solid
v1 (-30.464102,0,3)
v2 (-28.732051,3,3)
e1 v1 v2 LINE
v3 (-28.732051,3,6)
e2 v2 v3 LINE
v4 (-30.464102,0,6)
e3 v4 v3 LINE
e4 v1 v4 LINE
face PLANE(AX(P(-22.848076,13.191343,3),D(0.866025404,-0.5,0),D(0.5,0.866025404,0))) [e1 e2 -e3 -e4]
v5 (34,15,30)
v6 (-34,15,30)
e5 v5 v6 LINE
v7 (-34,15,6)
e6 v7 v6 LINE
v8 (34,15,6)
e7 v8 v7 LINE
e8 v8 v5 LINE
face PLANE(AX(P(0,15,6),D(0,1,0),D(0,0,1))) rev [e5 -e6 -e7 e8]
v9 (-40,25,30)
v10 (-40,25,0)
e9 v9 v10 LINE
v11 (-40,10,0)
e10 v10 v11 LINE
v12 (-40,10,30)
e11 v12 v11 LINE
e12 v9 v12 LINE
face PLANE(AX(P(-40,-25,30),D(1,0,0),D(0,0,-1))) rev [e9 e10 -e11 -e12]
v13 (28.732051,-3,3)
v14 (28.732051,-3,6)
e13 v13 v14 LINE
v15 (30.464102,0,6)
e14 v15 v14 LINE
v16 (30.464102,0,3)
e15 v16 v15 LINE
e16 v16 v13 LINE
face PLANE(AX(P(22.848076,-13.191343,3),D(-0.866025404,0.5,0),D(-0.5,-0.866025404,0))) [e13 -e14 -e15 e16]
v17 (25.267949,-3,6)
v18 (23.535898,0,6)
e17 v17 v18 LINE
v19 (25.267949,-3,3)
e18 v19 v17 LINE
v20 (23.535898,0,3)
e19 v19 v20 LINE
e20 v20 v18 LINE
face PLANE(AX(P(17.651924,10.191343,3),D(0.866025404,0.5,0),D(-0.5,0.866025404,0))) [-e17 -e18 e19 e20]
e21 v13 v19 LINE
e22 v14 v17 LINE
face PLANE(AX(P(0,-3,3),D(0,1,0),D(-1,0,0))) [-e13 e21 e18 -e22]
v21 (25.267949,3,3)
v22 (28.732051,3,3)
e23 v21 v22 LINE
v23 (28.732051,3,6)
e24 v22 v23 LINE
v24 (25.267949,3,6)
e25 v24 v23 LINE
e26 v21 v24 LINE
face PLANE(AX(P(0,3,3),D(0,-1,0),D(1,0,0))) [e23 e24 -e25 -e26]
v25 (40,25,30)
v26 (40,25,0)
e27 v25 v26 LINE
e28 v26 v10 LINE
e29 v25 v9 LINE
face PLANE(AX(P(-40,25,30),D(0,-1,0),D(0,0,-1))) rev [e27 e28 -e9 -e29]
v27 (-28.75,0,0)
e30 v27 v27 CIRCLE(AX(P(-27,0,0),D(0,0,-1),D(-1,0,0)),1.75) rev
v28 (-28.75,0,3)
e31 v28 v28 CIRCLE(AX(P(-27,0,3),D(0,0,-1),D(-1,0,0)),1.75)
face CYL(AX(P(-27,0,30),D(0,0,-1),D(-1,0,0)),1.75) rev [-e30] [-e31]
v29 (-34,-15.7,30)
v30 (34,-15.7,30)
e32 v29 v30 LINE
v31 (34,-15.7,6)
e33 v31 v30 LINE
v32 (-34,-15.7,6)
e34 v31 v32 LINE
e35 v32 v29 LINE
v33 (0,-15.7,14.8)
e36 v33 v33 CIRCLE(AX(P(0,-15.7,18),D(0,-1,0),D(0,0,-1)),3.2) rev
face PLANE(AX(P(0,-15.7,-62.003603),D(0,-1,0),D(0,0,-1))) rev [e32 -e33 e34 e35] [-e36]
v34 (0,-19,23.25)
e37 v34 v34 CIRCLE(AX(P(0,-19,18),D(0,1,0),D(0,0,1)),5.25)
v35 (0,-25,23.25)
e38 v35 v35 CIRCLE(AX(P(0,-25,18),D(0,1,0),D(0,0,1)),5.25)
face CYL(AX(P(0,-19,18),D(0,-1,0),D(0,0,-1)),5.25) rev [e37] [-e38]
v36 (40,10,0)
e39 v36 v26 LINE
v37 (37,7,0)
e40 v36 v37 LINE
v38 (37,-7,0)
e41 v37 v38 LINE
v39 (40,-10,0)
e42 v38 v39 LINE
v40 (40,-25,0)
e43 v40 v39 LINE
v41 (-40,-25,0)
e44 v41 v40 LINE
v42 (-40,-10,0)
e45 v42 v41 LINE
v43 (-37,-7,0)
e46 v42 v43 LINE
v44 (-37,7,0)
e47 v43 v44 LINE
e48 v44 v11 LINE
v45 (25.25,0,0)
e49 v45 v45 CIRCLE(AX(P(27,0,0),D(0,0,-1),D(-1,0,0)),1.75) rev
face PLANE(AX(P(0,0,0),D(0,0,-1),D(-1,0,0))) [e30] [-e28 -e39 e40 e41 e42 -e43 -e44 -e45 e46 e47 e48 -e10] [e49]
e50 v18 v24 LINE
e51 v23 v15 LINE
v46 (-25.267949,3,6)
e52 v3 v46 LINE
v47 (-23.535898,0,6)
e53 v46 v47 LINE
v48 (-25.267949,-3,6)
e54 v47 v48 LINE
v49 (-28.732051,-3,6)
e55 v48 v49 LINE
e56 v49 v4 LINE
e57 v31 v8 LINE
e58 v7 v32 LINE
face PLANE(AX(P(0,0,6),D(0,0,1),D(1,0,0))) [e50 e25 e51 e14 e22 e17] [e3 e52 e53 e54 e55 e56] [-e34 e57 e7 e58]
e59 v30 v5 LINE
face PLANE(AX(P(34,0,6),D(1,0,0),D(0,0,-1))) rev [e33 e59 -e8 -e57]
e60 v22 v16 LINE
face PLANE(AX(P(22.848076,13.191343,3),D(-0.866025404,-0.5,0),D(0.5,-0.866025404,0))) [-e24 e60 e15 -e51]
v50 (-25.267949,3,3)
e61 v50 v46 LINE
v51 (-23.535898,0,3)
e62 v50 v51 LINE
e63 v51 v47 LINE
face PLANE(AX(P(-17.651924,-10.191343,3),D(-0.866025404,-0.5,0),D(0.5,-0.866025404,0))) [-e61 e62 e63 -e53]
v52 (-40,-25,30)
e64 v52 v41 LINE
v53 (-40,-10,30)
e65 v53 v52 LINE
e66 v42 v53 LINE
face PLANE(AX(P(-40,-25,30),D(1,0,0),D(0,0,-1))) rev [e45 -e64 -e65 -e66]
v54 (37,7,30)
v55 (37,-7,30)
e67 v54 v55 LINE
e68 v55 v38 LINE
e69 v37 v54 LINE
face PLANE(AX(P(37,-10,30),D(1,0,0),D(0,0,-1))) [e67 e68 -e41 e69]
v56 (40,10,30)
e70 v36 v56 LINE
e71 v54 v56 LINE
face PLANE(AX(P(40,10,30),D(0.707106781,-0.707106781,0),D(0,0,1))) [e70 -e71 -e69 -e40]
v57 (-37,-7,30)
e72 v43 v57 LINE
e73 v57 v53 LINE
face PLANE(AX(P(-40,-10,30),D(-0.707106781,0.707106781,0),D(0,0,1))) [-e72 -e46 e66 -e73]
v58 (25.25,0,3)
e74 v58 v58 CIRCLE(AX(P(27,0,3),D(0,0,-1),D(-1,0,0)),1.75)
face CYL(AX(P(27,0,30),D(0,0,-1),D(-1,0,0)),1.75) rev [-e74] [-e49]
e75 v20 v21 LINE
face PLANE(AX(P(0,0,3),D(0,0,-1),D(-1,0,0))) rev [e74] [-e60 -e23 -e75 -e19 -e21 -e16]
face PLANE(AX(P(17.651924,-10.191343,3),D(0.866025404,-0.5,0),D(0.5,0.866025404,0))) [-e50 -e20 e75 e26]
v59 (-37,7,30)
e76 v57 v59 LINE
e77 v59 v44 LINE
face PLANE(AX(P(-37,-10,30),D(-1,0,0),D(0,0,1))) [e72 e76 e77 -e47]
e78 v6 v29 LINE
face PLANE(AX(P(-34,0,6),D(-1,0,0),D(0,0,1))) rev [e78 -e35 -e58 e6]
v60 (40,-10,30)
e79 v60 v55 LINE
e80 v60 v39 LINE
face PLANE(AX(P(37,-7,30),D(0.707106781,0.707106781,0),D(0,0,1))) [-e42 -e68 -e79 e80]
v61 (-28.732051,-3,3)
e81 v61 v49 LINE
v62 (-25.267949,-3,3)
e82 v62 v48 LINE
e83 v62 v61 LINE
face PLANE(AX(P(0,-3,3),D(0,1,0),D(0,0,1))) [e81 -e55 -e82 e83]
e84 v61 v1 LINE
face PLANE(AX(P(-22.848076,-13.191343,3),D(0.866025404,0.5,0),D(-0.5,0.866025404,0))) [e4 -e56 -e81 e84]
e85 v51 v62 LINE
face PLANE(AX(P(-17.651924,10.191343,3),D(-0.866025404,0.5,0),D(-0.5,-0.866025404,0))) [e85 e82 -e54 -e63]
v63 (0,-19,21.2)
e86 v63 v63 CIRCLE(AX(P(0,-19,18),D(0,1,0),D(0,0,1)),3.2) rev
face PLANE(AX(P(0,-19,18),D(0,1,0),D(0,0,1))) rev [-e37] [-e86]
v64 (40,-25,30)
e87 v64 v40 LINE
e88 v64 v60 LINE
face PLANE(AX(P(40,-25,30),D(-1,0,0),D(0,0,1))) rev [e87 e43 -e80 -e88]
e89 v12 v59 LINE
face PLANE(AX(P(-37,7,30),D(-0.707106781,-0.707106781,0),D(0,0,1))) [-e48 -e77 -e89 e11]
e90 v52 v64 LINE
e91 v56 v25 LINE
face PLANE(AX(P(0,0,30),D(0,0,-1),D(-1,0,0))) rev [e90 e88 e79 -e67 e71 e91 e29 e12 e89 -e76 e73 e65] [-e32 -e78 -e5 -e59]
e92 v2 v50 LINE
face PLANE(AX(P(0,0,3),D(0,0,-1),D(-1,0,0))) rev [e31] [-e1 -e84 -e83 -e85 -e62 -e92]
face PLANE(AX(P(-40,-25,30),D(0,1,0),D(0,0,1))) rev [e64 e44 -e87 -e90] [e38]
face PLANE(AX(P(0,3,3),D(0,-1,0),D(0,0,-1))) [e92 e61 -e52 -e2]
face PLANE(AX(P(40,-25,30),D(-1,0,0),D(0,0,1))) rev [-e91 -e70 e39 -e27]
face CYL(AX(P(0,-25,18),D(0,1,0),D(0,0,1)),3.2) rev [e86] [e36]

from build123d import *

# Parameters (mm, degrees)
SKETCH1_W               = 80
SKETCH1_H               = 50
BOSS_EXTRUDE1_DEPTH     = 30
CUT_EXTRUDE1_DEPTH      = 56.901699437
CUT_EXTRUDE1_DEPTH_BACK = 56.901699437
SKETCH2_W               = 6
SKETCH2_H               = 20
CHAMFER1_SIZE           = 3
CUT_EXTRUDE2_START      = 30
SKETCH3_W               = 68
SKETCH3_H               = 30
CUT_EXTRUDE2_DEPTH      = 24
SKETCH4_R               = 3.2
CUT_EXTRUDE3_DEPTH      = 56.901699437
CUT_EXTRUDE4_DEPTH      = 56.901699437
CUT_EXTRUDE4_DEPTH_BACK = 56.901699437
SKETCH5_R               = 1.75
CUT_EXTRUDE5_START      = 6
CUT_EXTRUDE5_DEPTH      = 3
CUT_EXTRUDE6_START      = -25
SKETCH7_R               = 5.25
CUT_EXTRUDE6_DEPTH      = 6
CUT_EXTRUDE8_START      = 30
SKETCH10_W              = 68
SKETCH10_H              = 0.7
CUT_EXTRUDE8_DEPTH      = 24


with BuildPart() as part:
    # Sketch1 → Boss-Extrude1 (new body)
    with BuildSketch(Plane.XY):
        Rectangle(SKETCH1_W, SKETCH1_H)
    extrude(amount=BOSS_EXTRUDE1_DEPTH)

    # Sketch2 → Cut-Extrude1 (cut, two sides: drawn at the far end of the back side and taken through both)
    with BuildSketch(Plane.XY.offset(-CUT_EXTRUDE1_DEPTH_BACK)):
        with Locations((-40, 0)):
            Rectangle(SKETCH2_W, SKETCH2_H)
        with Locations((40, 0)):
            Rectangle(SKETCH2_W, SKETCH2_H)
    extrude(amount=CUT_EXTRUDE1_DEPTH + CUT_EXTRUDE1_DEPTH_BACK, mode=Mode.SUBTRACT)

    # Chamfer1
    chamfer1_edges = [part.edges().sort_by_distance(p)[0] for p in [
        (37, 10, 15),
        (37, -10, 15),
        (-37, -10, 15),
        (-37, 10, 15),
    ]]
    chamfer(chamfer1_edges, length=CHAMFER1_SIZE - 0.0001)  # a hair under: the kernel refuses the full size

    # Sketch3 → Cut-Extrude2 (cut)
    with BuildSketch(Plane.XY.offset(CUT_EXTRUDE2_START)):
        Rectangle(SKETCH3_W, SKETCH3_H)
    extrude(amount=-CUT_EXTRUDE2_DEPTH, mode=Mode.SUBTRACT)

    # Sketch4 → Cut-Extrude3 (cut, through all)
    with BuildSketch(Plane(origin=(0, 0, 0), x_dir=(1, 0, 0), z_dir=(0, 1, 0))):
        with Locations(Location((0, -18, 0), (0, 0, 270))):
            Circle(SKETCH4_R)
    extrude(amount=-CUT_EXTRUDE3_DEPTH, mode=Mode.SUBTRACT)

    # Sketch5 → Cut-Extrude4 (cut, two sides: drawn at the far end of the back side and taken through both)
    with BuildSketch(Plane.XY.offset(-CUT_EXTRUDE4_DEPTH_BACK)):
        with Locations(Location((27, 0, 0), (0, 0, 180))):
            Circle(SKETCH5_R)
        with Locations(Location((-27, 0, 0), (0, 0, 180))):
            Circle(SKETCH5_R)
    extrude(amount=CUT_EXTRUDE4_DEPTH + CUT_EXTRUDE4_DEPTH_BACK, mode=Mode.SUBTRACT)

    # Sketch6 → Cut-Extrude5 (cut)
    with BuildSketch(Plane.XY.offset(CUT_EXTRUDE5_START)):
        Polygon((-23.535898385, 0), (-25.267949192, 3), (-28.732050808, 3), (-30.464101615, 0), (-28.732050808, -3), (-25.267949192, -3), align=None)
        Polygon((30.464101615, 0), (28.732050808, 3), (25.267949192, 3), (23.535898385, 0), (25.267949192, -3), (28.732050808, -3), align=None)
    extrude(amount=-CUT_EXTRUDE5_DEPTH, mode=Mode.SUBTRACT)

    # Sketch7 → Cut-Extrude6 (cut)
    with BuildSketch(Plane(origin=(0, 0, 0), x_dir=(1, 0, 0), z_dir=(0, 1, 0)).offset(CUT_EXTRUDE6_START)):
        with Locations(Location((0, -18, 0), (0, 0, 270))):
            Circle(SKETCH7_R)
    extrude(amount=CUT_EXTRUDE6_DEPTH, mode=Mode.SUBTRACT)

    # Sketch10 → Cut-Extrude8 (cut)
    with BuildSketch(Plane.XY.offset(CUT_EXTRUDE8_START)):
        with Locations((0, -15.35)):
            Rectangle(SKETCH10_W, SKETCH10_H)
    extrude(amount=-CUT_EXTRUDE8_DEPTH, mode=Mode.SUBTRACT)


solid = part.part
